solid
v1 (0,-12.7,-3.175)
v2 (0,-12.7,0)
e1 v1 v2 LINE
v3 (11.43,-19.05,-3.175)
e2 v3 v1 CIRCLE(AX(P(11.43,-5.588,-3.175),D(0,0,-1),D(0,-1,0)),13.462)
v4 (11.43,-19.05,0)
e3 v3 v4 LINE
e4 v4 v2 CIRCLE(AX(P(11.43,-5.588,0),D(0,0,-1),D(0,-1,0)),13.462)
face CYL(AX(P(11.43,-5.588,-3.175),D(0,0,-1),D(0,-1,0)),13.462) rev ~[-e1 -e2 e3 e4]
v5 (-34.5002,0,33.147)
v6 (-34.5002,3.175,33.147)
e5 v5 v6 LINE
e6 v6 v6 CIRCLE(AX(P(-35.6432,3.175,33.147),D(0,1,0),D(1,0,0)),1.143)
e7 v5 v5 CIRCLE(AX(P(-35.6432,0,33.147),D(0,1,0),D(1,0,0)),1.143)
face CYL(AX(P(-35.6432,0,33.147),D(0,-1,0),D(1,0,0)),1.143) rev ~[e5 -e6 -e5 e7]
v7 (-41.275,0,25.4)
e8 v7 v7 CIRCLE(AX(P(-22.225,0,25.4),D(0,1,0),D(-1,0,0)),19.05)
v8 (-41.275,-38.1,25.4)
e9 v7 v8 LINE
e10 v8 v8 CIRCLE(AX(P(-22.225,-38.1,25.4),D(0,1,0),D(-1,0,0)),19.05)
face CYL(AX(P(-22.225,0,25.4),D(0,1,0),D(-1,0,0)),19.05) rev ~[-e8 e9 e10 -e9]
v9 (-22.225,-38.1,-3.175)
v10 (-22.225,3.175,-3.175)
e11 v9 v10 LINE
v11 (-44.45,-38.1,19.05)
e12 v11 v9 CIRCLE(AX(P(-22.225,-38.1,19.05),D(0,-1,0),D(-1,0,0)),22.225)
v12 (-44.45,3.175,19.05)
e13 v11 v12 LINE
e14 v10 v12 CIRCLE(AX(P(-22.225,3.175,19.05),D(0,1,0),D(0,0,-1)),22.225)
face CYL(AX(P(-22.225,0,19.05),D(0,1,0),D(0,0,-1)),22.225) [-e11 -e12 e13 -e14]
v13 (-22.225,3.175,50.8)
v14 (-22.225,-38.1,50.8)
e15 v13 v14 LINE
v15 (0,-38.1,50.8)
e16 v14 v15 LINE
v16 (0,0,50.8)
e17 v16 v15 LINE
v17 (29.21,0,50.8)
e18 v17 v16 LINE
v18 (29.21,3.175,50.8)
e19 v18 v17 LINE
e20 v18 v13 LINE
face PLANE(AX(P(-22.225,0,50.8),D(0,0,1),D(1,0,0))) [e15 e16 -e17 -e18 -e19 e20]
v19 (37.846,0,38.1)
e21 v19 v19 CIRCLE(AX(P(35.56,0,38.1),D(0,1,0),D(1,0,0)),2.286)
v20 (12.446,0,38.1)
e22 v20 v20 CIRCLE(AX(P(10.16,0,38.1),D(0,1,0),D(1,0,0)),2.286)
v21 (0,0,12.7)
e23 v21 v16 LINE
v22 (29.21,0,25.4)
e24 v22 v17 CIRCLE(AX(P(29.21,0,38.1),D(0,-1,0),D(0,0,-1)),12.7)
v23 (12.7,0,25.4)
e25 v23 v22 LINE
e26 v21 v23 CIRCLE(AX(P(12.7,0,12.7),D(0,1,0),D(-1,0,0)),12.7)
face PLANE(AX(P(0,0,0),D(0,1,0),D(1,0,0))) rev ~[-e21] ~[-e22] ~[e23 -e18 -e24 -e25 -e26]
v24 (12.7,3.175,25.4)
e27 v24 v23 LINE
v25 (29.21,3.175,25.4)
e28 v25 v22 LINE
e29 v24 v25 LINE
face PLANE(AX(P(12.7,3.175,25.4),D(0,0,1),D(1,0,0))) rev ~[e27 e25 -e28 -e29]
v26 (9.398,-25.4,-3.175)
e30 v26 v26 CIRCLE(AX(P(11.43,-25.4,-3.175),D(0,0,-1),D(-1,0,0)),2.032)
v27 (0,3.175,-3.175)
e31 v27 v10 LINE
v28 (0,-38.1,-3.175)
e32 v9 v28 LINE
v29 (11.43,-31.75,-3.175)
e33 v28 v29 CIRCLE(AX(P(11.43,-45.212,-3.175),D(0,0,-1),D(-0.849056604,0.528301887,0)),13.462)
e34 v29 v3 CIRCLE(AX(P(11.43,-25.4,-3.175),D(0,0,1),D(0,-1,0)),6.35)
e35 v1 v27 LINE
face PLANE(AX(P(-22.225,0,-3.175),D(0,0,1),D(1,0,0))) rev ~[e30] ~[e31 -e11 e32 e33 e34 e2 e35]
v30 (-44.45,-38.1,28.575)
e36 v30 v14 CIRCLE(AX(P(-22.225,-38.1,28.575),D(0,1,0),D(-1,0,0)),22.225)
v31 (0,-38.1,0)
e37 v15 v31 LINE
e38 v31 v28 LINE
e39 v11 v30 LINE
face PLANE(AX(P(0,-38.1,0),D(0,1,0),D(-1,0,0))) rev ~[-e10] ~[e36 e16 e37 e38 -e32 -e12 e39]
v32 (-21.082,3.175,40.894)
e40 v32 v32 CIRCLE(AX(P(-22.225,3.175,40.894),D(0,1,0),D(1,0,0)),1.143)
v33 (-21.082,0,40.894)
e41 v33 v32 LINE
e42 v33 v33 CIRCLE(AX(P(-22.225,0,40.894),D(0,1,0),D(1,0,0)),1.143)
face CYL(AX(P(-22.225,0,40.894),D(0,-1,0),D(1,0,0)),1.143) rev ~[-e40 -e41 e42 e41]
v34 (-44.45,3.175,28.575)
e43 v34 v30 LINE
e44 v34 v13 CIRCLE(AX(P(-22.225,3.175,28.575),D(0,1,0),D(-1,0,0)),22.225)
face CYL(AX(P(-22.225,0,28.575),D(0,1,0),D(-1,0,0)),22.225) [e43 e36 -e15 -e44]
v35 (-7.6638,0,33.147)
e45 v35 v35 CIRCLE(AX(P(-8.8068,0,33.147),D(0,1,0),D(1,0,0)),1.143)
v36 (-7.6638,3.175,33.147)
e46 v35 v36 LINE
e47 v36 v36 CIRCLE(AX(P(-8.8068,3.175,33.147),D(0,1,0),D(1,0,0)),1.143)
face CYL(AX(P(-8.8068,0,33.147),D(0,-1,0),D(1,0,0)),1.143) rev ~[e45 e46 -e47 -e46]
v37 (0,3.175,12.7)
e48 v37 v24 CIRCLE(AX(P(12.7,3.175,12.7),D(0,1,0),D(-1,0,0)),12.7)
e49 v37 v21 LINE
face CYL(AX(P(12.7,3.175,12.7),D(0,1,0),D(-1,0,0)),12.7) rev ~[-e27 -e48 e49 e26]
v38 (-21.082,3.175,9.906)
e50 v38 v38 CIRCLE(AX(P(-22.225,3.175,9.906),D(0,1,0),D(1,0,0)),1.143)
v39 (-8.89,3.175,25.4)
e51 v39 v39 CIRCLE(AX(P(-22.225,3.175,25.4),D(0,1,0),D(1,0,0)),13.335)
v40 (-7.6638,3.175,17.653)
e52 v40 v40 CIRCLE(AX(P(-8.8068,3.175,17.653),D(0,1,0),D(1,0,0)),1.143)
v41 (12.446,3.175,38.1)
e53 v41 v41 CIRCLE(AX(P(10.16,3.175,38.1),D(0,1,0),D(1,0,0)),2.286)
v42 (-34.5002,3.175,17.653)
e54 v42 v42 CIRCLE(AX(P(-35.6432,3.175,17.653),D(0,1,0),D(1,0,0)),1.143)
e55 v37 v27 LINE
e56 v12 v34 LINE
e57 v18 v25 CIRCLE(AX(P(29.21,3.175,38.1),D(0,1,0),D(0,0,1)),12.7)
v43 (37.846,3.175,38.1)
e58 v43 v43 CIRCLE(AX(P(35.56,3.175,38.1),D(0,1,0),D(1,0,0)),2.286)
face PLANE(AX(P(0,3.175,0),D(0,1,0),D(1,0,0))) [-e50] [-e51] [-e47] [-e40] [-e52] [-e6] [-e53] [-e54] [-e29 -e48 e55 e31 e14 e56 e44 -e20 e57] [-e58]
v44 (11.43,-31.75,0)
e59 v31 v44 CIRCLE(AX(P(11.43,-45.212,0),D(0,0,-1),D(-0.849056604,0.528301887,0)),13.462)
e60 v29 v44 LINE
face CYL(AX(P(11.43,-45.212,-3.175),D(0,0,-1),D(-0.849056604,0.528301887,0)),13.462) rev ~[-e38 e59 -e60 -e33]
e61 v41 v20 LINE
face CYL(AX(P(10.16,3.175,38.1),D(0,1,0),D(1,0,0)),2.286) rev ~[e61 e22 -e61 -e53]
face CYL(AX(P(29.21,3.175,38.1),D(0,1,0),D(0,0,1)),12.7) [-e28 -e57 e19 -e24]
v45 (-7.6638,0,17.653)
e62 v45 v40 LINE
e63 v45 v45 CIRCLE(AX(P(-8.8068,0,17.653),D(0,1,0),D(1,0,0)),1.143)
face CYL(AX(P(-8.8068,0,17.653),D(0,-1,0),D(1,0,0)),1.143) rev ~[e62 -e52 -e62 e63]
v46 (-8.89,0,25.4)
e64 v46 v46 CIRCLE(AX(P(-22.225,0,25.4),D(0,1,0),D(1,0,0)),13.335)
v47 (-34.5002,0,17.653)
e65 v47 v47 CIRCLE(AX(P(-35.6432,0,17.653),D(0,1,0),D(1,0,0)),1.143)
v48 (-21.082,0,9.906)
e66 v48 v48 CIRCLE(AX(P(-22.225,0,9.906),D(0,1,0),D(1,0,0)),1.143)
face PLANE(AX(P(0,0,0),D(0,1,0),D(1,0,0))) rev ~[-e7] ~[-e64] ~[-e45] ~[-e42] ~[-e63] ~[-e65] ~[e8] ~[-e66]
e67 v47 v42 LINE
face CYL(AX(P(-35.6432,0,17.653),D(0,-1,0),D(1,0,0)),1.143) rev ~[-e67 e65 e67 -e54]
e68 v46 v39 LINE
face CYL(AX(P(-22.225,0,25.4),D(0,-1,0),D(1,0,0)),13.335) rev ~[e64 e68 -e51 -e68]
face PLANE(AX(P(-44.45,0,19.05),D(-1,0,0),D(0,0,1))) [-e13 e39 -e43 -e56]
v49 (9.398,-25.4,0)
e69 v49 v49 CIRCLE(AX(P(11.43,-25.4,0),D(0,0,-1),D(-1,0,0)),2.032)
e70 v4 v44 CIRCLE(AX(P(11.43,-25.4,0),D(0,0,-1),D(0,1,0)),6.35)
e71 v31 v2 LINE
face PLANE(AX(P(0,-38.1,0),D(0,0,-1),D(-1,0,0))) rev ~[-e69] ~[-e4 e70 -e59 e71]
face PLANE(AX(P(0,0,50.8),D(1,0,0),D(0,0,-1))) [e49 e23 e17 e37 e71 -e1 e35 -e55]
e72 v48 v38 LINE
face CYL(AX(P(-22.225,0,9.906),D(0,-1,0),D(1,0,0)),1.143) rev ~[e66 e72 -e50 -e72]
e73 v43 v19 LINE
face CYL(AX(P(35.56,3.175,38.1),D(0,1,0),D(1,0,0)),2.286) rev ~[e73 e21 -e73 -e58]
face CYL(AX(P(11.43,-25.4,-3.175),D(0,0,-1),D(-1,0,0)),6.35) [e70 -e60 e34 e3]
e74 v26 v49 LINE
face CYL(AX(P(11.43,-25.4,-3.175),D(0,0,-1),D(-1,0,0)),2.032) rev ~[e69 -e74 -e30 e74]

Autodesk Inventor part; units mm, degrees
ref_plane "YZ Plane" through (0, 0, 0) normal (1, 0, 0) x (0, 1, 0)
ref_plane "XZ Plane" through (0, 0, 0) normal (0, 1, 0) x (-1, 0, 0)
ref_plane "XY Plane" through (0, 0, 0) normal (0, 0, 1) x (1, 0, 0)
sketch "Sketch1" plane through (0, 0, 0) normal (0, 1, 0) x (-1, 0, 0)
  line L0 (0, 0) -> (44.45, 0)
  line L1 (44.45, 0) -> (44.45, 50.8)
  line L2 (44.45, 50.8) -> (0, 50.8)
  line L3 (0, 50.8) -> (0, 0)
  circle A0 centre (22.225, 25.4) radius 19.05
  line L4 (44.45, 25.4) -> (0, 25.4) construction
  line L5 (22.225, 50.8) -> (22.225, 0) construction
  line L6 (44.45, 0) -> (44.45, -3.175)
  line L7 (44.45, -3.175) -> (0, -3.175)
  line L8 (0, -3.175) -> (0, 0)
  arc A1 (44.45, 28.575) -> (22.225, 50.8) centre (22.225, 28.575) ccw
  arc A2 (22.225, -3.175) -> (44.45, 19.05) centre (22.225, 19.05) ccw
  line L9 (22.225, -3.175) -> (22.225, 0)
  dimension "d1" = 38.1
  dimension "d2" = 50.8
  dimension "d22" = 44.45
  dimension "d37" = 3.175
extrude "Extrusion1" add sketch "Sketch1" against normal blind 38.1 contours L3 L2 A1 L1 A2 L0 | L0 L9 L7 L8 | L0 A2 L9
sketch "Sketch3" plane through (0, 0, 0) normal (0, 1, 0) x (1, 0, 0)
  line L0 (-44.45, -19.05) -> (-44.45, -28.575) projected
  line L1 (-22.225, -50.8) -> (0, -50.8) projected
  line L2 (0, -50.8) -> (0, 3.175) projected
  circle A0 centre (-22.225, -25.4) radius 19.05 projected
  circle A1 centre (-22.225, -25.4) radius 13.335
  circle A2 centre (-22.225, -9.906) radius 1.143
  circle A3 centre (-35.6432, -17.653) radius 1.143
  circle A4 centre (-35.6432, -33.147) radius 1.143
  circle A5 centre (-22.225, -40.894) radius 1.143
  circle A6 centre (-8.8068, -33.147) radius 1.143
  circle A7 centre (-8.8068, -17.653) radius 1.143
  line L3 (0, 3.175) -> (-22.225, 3.175) projected
  arc A8 (-22.225, 3.175) -> (-44.45, -19.05) centre (-22.225, -19.05) ccw projected
  arc A9 (-44.45, -28.575) -> (-22.225, -50.8) centre (-22.225, -28.575) ccw projected
  point P0 (0, 0)
  dimension "d6" = 26.67
  dimension "d7" = 2.286
  dimension "d8" = 15.494
  dimension "d11" = 360
extrude "Extrusion2" add sketch "Sketch3" along normal blind 3.175 contours A8 L3 L2 L1 A9 L0 | A0
sketch "Sketch4" plane through (0, 3.175, 0) normal (0, 1, 0) x (1, 0, 0)
  line L0 (-22.225, -50.8) -> (0, -50.8) projected
  line L1 (0, -50.8) -> (0, 3.175) projected
  line L2 (-44.45, -19.05) -> (-44.45, -28.575) projected
  circle A0 centre (-22.225, -25.4) radius 13.335 projected
  circle A1 centre (-22.225, -9.906) radius 1.143 projected
  circle A2 centre (-35.6432, -17.653) radius 1.143 projected
  circle A3 centre (-35.6432, -33.147) radius 1.143 projected
  circle A4 centre (-22.225, -40.894) radius 1.143 projected
  circle A5 centre (-8.8068, -33.147) radius 1.143 projected
  circle A6 centre (-8.8068, -17.653) radius 1.143 projected
  line L3 (0, -25.4) -> (41.91, -25.4)
  line L4 (41.91, -25.4) -> (41.91, -50.8)
  line L5 (41.91, -50.8) -> (0, -50.8)
  line L6 (0, -50.8) -> (0, -25.4)
  circle A7 centre (10.16, -38.1) radius 2.286
  circle A8 centre (35.56, -38.1) radius 2.286
  line L7 (0, -38.1) -> (41.91, -38.1) construction
  arc A9 (29.21, -50.8) -> (29.21, -25.4) centre (29.21, -38.1) ccw
  arc A10 (0, -12.7) -> (12.7, -25.4) centre (12.7, -12.7) ccw
  arc A11 (-22.225, 3.175) -> (-44.45, -19.05) centre (-22.225, -19.05) ccw projected
  arc A12 (-44.45, -28.575) -> (-22.225, -50.8) centre (-22.225, -28.575) ccw projected
  line L8 (0, 3.175) -> (-22.225, 3.175) projected
  point P0 (0, 0)
  point P1 (0, -50.8)
  dimension "d15" = 10.16
  dimension "d16" = 25.4
  dimension "d17" = 4.572
  dimension "d18" = 25.4
  dimension "d19" = 6.35
  dimension "d30" = 12.7
extrude "Extrusion3" add sketch "Sketch4" against normal blind 3.175 contours L1 L3 A9 L5 | L1 A10 L3
sketch "Sketch6" plane through (0, -38.1, -3.175) normal (0, 0, -1) x (-1, 0, 0)
  line L0 (0, 0) -> (0, 41.275) projected
  line L1 (44.45, 0) -> (0, 0) projected
  line L2 (0, 41.275) -> (44.45, 41.275) projected
  line L3 (0, 19.05) -> (-17.78, 19.05)
  line L4 (-17.78, 19.05) -> (-17.78, 6.35)
  line L5 (-17.78, 6.35) -> (0, 6.35)
  line L6 (0, 6.35) -> (0, 19.05)
  circle A0 centre (-11.43, 12.7) radius 2.032
  line L7 (0, 12.7) -> (-17.78, 12.7) construction
  circle A1 centre (-11.43, 12.7) radius 6.35
  arc A2 (0, 0) -> (-11.43, 6.35) centre (-11.43, -7.112) ccw
  line L8 (0, 0) -> (0, 41.275) projected
  arc A3 (-11.43, 19.05) -> (0, 25.4) centre (-11.43, 32.512) ccw
  line L9 (44.45, 41.275) -> (44.45, 0) projected
  point P0 (0, 38.1)
  point P1 (0, 25.4)
  dimension "d24" = 11.43
  dimension "d25" = 4.064
  dimension "d26" = 6.35
  dimension "d27" = 6.35
  dimension "d36" = 25.4
extrude "Extrusion4" add sketch "Sketch6" against normal blind 3.175 contours A2 L5 L0 | L5 A1 L3 L0 | A1 | L3 A3 L0
fillet "Fillet2" [suppressed]
ref_plane "Work Plane1" through (0, -63.5, 0) normal (0, -1, 0) x (1, 0, 0)
mirror "Mirror1" about plane through (0, -63.5, 0) normal (0, -1, 0) of "Extrusion4", "Extrusion3", "Extrusion2", "Extrusion1"
sketch "Sketch7" plane through (0, -63.5, 0) normal (0, -1, 0) x (1, 0, 0)
  line L0 (-66.3836, -28.6153) -> (65.8055, -28.6153)
  line L1 (65.8055, -28.6153) -> (65.8055, 56.7488)
  line L2 (65.8055, 56.7488) -> (-66.3836, 56.7488)
  line L3 (-66.3836, 56.7488) -> (-66.3836, -28.6153)
  point P0 (0, 0)
extrude "Extrusion5" cut sketch "Sketch7" along normal through all
properties part number "Motor Mount right_3DPrint"
